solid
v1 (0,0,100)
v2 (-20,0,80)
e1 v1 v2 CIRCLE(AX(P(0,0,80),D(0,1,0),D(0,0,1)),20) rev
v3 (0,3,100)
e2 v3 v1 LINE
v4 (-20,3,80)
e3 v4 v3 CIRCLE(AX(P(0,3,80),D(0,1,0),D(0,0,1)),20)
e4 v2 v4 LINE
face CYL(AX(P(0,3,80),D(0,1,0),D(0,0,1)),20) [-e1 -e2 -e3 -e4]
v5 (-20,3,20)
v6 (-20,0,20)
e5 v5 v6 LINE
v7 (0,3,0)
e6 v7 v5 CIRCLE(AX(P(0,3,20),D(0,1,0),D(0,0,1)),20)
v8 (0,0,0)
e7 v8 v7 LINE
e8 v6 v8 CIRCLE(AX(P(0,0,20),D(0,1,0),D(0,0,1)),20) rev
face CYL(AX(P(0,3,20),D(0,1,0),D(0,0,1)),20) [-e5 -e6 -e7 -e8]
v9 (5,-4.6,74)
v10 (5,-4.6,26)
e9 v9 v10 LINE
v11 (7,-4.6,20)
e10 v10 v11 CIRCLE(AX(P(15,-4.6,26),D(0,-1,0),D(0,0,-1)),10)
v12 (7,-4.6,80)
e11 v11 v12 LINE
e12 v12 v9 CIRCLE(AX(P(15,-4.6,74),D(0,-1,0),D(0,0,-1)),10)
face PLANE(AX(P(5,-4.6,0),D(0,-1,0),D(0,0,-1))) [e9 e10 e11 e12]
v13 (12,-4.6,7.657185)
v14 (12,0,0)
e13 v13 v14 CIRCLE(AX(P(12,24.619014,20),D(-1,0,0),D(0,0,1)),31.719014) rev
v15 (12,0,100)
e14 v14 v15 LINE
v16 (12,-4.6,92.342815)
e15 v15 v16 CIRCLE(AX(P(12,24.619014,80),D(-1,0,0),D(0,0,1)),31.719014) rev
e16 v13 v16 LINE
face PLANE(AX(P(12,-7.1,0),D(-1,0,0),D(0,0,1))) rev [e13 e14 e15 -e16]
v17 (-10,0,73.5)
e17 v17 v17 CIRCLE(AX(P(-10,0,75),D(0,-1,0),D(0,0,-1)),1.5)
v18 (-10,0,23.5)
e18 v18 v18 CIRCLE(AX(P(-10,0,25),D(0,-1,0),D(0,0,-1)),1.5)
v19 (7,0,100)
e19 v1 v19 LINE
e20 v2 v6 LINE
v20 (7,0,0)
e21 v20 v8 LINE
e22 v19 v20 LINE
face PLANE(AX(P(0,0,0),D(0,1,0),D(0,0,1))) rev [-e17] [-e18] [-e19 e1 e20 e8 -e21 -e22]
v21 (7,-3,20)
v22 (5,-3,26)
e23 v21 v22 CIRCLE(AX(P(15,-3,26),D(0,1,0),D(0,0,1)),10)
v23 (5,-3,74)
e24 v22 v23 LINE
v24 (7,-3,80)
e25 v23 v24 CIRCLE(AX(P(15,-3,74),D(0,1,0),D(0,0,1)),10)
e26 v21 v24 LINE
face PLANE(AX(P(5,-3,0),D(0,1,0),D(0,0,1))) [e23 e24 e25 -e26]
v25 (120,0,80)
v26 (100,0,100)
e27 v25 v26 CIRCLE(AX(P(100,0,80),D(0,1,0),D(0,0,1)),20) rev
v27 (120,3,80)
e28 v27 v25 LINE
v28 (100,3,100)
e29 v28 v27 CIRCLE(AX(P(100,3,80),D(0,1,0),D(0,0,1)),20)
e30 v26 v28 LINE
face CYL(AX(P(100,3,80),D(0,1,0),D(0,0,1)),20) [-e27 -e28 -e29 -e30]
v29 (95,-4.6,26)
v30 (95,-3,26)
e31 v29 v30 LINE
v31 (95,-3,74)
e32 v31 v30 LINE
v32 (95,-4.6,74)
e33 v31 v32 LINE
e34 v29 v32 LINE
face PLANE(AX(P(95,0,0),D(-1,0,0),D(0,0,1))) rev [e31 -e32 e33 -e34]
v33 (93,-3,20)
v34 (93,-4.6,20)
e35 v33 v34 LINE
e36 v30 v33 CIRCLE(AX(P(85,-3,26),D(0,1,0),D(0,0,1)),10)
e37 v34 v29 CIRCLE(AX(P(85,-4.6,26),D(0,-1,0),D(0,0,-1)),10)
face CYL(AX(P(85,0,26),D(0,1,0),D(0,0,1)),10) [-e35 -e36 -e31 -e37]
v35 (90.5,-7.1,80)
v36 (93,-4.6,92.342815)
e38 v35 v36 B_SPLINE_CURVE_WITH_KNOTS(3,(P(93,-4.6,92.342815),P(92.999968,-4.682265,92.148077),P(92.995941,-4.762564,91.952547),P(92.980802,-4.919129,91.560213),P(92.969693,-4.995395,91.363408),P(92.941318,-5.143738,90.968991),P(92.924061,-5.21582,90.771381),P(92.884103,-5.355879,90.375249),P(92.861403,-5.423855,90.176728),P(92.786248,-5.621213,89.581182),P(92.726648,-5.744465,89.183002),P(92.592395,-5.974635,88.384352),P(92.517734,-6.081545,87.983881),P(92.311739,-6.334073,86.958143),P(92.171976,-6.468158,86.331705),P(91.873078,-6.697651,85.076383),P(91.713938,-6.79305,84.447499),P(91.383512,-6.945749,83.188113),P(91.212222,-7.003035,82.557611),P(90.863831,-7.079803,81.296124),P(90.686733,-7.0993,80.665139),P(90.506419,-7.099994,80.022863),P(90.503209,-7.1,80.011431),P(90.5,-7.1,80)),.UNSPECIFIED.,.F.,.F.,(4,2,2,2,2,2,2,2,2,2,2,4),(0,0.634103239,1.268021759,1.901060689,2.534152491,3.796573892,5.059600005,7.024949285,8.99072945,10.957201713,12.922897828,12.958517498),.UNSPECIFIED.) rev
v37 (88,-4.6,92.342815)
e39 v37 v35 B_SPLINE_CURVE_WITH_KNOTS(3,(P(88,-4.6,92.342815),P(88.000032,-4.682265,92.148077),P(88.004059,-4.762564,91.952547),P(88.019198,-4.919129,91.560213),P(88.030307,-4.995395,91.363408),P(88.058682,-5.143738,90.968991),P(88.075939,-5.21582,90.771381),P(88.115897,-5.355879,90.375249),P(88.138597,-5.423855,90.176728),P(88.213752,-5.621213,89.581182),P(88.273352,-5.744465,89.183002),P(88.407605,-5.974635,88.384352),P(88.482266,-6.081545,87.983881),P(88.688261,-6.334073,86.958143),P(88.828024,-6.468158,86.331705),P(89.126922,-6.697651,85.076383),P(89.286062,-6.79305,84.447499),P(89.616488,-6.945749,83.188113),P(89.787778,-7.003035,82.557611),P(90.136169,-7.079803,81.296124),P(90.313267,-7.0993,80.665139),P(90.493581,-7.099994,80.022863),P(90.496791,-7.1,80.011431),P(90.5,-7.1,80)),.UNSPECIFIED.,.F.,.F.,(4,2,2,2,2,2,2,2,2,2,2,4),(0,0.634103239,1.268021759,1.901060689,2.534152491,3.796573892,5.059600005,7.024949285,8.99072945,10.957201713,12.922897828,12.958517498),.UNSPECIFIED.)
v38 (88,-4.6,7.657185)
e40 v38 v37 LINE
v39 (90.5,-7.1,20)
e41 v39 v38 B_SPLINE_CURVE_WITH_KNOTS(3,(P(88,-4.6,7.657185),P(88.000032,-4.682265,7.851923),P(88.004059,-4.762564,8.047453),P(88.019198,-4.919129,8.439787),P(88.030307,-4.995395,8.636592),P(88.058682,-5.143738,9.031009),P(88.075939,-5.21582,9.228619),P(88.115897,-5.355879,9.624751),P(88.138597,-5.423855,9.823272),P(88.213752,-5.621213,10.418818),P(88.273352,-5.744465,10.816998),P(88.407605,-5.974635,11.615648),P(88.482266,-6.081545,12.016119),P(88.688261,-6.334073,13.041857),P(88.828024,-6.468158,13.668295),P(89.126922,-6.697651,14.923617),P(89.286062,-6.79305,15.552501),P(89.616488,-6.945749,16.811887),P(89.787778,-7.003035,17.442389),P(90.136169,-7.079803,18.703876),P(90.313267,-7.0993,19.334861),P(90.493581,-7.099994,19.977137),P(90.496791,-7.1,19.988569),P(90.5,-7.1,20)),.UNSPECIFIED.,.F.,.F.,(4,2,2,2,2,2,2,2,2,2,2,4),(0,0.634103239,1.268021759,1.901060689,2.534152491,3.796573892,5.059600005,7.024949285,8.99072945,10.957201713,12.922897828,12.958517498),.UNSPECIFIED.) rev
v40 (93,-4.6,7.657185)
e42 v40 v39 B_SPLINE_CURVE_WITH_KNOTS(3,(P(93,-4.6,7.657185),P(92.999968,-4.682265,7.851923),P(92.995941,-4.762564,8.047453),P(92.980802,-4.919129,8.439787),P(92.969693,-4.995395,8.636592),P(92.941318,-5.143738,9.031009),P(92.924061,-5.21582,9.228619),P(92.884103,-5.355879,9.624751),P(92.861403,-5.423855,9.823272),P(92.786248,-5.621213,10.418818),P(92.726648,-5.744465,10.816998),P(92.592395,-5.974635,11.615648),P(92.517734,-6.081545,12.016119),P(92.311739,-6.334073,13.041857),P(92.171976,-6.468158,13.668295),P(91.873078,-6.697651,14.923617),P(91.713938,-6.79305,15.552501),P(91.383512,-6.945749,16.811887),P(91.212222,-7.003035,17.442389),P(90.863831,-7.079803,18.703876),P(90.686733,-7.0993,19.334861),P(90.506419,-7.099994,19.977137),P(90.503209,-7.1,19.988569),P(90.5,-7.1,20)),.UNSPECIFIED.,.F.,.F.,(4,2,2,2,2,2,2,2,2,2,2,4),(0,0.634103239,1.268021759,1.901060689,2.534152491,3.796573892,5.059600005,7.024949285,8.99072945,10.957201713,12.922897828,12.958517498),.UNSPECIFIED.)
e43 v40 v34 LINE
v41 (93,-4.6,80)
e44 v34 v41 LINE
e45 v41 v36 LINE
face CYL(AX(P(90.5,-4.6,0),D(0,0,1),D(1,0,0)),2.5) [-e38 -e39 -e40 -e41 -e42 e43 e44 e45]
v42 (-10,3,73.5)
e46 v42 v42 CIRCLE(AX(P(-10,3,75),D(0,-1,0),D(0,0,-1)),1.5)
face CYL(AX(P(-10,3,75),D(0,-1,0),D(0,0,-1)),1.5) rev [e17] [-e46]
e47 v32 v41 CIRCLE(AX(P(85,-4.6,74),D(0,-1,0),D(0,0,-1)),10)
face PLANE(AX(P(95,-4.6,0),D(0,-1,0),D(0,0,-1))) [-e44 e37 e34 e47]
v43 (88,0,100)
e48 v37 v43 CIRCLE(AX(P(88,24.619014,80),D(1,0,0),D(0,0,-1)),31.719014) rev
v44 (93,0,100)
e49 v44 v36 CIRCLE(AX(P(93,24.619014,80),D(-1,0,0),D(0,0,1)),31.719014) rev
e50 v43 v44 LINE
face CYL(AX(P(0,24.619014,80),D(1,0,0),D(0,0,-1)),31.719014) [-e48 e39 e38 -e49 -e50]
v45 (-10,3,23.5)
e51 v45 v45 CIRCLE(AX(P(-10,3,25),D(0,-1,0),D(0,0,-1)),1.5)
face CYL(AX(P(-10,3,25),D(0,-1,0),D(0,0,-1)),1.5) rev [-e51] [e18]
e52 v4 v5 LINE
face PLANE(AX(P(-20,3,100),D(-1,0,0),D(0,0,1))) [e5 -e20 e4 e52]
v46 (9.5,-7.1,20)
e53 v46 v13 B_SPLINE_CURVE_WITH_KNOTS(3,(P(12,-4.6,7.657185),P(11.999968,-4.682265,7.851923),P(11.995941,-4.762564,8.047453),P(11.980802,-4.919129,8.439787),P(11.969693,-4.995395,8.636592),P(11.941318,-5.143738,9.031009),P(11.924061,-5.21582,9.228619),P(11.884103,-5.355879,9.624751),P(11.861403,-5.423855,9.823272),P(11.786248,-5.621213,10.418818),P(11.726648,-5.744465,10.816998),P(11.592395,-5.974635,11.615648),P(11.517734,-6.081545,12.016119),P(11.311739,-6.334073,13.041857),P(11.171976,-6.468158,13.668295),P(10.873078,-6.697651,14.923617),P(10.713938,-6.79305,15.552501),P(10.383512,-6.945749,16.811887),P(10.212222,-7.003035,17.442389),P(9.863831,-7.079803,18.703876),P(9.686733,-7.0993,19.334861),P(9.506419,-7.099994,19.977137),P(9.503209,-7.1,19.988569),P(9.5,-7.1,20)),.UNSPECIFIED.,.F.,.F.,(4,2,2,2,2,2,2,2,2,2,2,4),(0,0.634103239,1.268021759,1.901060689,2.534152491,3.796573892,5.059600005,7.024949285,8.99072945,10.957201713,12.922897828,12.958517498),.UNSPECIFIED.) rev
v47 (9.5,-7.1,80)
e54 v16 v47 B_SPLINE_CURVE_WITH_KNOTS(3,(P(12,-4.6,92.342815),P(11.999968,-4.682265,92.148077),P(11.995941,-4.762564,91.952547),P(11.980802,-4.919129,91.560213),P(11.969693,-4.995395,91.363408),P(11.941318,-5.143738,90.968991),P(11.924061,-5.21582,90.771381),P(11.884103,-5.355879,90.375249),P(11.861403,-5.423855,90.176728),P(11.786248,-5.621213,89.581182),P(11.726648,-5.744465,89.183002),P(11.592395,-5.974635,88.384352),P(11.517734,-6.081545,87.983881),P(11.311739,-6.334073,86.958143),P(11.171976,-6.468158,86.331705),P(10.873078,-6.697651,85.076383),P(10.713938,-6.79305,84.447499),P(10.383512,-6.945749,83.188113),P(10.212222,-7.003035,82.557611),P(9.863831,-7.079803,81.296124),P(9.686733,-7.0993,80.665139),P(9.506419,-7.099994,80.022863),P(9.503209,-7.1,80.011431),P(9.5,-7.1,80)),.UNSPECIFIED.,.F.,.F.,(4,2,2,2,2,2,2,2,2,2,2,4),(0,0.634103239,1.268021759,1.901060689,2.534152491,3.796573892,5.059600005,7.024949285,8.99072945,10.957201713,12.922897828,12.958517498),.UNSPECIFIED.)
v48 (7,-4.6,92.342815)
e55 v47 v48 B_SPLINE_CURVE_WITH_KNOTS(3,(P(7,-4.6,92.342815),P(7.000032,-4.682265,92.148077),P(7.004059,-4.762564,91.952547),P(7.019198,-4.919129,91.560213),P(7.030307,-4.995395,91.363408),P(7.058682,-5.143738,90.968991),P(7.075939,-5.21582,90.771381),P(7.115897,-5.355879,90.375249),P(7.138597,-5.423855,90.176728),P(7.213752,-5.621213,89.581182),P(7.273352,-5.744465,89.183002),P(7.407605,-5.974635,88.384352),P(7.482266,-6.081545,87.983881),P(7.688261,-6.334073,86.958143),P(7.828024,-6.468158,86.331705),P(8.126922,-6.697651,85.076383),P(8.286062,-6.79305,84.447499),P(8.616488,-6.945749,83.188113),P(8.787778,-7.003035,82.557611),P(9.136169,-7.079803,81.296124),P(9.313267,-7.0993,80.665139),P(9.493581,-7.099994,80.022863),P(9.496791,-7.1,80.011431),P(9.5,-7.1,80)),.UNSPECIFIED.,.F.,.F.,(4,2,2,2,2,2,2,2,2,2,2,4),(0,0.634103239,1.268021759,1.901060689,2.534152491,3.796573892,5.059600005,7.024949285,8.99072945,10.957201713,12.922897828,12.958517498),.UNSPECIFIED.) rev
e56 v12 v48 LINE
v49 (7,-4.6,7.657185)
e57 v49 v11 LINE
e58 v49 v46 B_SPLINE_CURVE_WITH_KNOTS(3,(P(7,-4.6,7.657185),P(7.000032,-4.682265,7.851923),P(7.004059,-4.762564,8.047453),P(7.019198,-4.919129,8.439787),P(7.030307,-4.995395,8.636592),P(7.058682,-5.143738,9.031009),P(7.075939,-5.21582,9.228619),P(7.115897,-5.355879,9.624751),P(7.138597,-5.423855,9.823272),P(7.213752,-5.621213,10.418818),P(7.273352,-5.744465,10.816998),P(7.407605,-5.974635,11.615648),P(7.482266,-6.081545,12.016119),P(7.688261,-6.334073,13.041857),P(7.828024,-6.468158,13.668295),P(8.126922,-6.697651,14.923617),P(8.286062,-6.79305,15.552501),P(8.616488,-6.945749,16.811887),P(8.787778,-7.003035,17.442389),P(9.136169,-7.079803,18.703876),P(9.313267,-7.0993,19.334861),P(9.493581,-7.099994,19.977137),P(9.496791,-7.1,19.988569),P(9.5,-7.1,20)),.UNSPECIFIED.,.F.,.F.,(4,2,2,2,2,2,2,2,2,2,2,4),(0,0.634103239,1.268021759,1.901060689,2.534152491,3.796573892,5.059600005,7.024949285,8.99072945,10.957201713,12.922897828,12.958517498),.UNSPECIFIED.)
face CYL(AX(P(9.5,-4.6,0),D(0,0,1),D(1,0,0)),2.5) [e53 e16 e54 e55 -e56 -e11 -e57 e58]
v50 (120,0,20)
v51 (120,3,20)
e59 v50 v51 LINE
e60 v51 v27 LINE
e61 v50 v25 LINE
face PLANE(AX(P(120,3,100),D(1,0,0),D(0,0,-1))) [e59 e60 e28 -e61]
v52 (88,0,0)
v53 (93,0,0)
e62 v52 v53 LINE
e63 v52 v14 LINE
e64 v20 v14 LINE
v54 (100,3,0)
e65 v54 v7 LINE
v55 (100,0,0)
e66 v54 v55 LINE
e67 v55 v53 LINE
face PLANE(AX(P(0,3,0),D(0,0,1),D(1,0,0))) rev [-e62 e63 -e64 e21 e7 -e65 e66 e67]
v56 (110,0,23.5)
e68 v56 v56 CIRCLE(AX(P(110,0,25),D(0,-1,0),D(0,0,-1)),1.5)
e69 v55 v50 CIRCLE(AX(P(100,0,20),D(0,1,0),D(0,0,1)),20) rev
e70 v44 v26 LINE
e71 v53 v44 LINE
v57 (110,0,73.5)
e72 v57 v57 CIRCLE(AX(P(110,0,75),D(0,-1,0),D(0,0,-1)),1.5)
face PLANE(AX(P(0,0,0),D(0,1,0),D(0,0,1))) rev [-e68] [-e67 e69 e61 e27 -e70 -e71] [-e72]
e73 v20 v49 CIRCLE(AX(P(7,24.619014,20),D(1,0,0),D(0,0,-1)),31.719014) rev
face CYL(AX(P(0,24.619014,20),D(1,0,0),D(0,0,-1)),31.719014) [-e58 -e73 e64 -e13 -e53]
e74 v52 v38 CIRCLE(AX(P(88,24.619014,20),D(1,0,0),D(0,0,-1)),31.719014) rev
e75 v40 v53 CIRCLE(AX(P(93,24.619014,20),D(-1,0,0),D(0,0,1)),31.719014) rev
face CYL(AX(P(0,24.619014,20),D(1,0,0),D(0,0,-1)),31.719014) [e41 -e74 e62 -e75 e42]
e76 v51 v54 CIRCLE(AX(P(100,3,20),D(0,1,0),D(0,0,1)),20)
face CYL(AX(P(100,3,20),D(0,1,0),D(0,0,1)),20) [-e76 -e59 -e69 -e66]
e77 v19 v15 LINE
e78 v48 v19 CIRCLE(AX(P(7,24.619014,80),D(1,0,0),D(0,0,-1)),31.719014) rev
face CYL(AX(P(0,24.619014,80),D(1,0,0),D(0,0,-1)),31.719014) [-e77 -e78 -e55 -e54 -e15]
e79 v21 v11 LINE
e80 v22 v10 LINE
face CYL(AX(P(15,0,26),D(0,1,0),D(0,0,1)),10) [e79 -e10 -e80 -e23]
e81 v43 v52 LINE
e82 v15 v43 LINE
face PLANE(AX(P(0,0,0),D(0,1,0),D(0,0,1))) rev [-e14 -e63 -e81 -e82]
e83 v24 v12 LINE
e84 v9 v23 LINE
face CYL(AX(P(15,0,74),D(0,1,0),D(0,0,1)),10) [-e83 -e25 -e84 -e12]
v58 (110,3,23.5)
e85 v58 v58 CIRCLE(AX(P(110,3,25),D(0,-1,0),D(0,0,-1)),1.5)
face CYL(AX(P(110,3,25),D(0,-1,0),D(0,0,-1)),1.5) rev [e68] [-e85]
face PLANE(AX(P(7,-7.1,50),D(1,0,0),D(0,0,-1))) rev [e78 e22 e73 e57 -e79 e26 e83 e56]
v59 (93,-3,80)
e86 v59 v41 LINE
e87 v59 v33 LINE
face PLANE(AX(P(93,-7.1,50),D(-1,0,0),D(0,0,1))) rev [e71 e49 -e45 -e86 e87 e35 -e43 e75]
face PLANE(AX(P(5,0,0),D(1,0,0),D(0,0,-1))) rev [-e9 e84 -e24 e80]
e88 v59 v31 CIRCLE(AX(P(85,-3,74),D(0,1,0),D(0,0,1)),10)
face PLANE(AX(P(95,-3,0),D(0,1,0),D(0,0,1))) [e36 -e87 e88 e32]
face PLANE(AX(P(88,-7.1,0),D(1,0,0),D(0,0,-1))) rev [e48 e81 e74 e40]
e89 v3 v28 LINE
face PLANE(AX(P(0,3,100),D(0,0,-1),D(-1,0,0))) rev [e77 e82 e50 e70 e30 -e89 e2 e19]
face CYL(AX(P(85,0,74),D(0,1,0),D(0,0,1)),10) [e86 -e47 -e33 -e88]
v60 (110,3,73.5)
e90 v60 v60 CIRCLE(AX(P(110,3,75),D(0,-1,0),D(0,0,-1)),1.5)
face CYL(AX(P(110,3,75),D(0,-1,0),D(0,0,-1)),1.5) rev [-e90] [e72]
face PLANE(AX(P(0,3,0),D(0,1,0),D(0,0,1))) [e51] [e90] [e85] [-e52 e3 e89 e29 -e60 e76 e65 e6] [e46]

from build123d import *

# Parameters (mm, degrees)
SKETCH_1_W          = 100
SKETCH_1_H          = 100
EXTRUDE_1_DEPTH     = 3
SKETCH_9_W          = 20
SKETCH_9_H          = 100
SKETCH_9_R          = 1.5
EXTRUDE_5_DEPTH     = 3
FILLET_1_R          = 20
EXTRUDE_6_DEPTH     = 7.1
CUT_EXTRUDE_5_DEPTH = 100
SKETCH_12_W         = 3.129471857
SKETCH_12_H         = 20
EXTRUDE_7_DEPTH     = 7.1
CUT_EXTRUDE_6_DEPTH = 100
SKETCH_14_W         = 103.339960755
SKETCH_14_H         = 14.24407727
CUT_EXTRUDE_7_DEPTH = 4
SKETCH_25_W         = 30
SKETCH_25_H         = 1.6
EXTRUDE_13_DEPTH    = 7
SKETCH_26_W         = 30
SKETCH_26_H         = 1.6
EXTRUDE_14_DEPTH    = 7
FILLET_7_R          = 10


with BuildPart() as part:
    # 草图1 → 凸台-拉伸1 (new body)
    with BuildSketch(Plane(origin=(0, 0, 0), x_dir=(1, 0, 0), z_dir=(0, 1, 0))):
        with Locations((50, -50)):
            Rectangle(SKETCH_1_W, SKETCH_1_H)
    extrude(amount=EXTRUDE_1_DEPTH)

    # 草图9 → 凸台-拉伸5 (add)
    # profile 1 of 2: a face of its own
    with BuildSketch(Plane.XZ):
        with Locations((110, 50)):
            Rectangle(SKETCH_9_W, SKETCH_9_H)
        with Locations(Location((110, 75, 0), (0, 0, 270))):
            Circle(SKETCH_9_R, mode=Mode.SUBTRACT)
        with Locations(Location((110, 25, 0), (0, 0, 270))):
            Circle(SKETCH_9_R, mode=Mode.SUBTRACT)
    # profile 2 of 2: a face of its own
    with BuildSketch(Plane.XZ):
        with Locations((-10, 50)):
            Rectangle(SKETCH_9_W, SKETCH_9_H)
        with Locations(Location((-10, 75, 0), (0, 0, 270))):
            Circle(SKETCH_9_R, mode=Mode.SUBTRACT)
        with Locations(Location((-10, 25, 0), (0, 0, 270))):
            Circle(SKETCH_9_R, mode=Mode.SUBTRACT)
    extrude(amount=-EXTRUDE_5_DEPTH)

    # 圆角1
    fillet_1_edges = [part.edges().sort_by_distance(p)[0] for p in [
        (120, 1.5, 100),
        (120, 1.5, 0),
        (-20, 1.5, 0),
        (-20, 1.5, 100),
    ]]
    fillet(fillet_1_edges, radius=FILLET_1_R)

    # 草图10 → 凸台-拉伸6 (add)
    with BuildSketch(Plane.XZ):
        Polygon((7, 50), (7, 0), (12, 0), (12, 100), (7, 100), align=None)
        Polygon((93, 50), (93, 0), (88, 0), (88, 100), (93, 100), align=None)
    extrude(amount=EXTRUDE_6_DEPTH)

    # 草图11 → 切除-拉伸5 (cut)
    with BuildSketch(Plane.XY.offset(100)):
        with BuildLine():
            Line((88, -4.6), (88, -7.1))
            Line((88, -7.1), (90.5, -7.1))
            ThreePointArc((90.5, -7.1), (88.732233047, -6.367766953), (88, -4.6))
        make_face()
        with BuildLine():
            ThreePointArc((93, -4.6), (92.267766953, -6.367766953), (90.5, -7.1))
            Line((90.5, -7.1), (93, -7.1))
            Line((93, -7.1), (93, -4.6))
        make_face()
        with BuildLine():
            ThreePointArc((12, -4.6), (11.267766953, -6.367766953), (9.5, -7.1))
            Line((9.5, -7.1), (12, -7.1))
            Line((12, -7.1), (12, -4.6))
        make_face()
        with BuildLine():
            ThreePointArc((9.5, -7.1), (7.732233047, -6.367766953), (7, -4.6))
            Line((7, -4.6), (7, -7.1))
            Line((7, -7.1), (9.5, -7.1))
        make_face()
    extrude(amount=-CUT_EXTRUDE_5_DEPTH, mode=Mode.SUBTRACT)

    # 草图12 → 凸台-拉伸7 (add)
    with BuildSketch(Plane.XZ):
        with Locations((98.435264072, 90)):
            Rectangle(SKETCH_12_W, SKETCH_12_H)
        with Locations((98.435264072, 10)):
            Rectangle(SKETCH_12_W, SKETCH_12_H)
    extrude(amount=EXTRUDE_7_DEPTH)

    # 草图13 → 切除-拉伸6 (cut)
    with BuildSketch(Plane(origin=(100, 0, 0), x_dir=(0, 0, -1), z_dir=(1, 0, 0))):
        with BuildLine():
            Line((-100, -7.1), (-100, 0))
            ThreePointArc((-100, 0), (-90.611432514, -5.27234511), (-80, -7.1))
            Line((-80, -7.1), (-100, -7.1))
        make_face()
        with BuildLine():
            Line((-20, -7.1), (0, -7.1))
            Line((0, -7.1), (0, 0))
            ThreePointArc((0, 0), (-9.388567486, -5.27234511), (-20, -7.1))
        make_face()
    extrude(amount=-CUT_EXTRUDE_6_DEPTH, mode=Mode.SUBTRACT)

    # 草图14 → 切除-拉伸7 (cut)
    with BuildSketch(Plane(origin=(100, 0, 0), x_dir=(0, 0, -1), z_dir=(1, 0, 0))):
        with Locations((-48.330019622, -7.122038635)):
            Rectangle(SKETCH_14_W, SKETCH_14_H)
    extrude(amount=-CUT_EXTRUDE_7_DEPTH, mode=Mode.SUBTRACT)

    # 草图25 → 凸台-拉伸13 (add)
    with BuildSketch(Plane.ZY.offset(-88)):
        with Locations((65, -3.8)):
            Rectangle(SKETCH_25_W, SKETCH_25_H)
        with Locations((35, -3.8)):
            Rectangle(SKETCH_25_W, SKETCH_25_H)
    extrude(amount=-EXTRUDE_13_DEPTH)

    # 草图26 → 凸台-拉伸14 (add)
    with BuildSketch(Plane(origin=(12, 0, 0), x_dir=(0, 0, -1), z_dir=(1, 0, 0))):
        with Locations((-65, -3.8)):
            Rectangle(SKETCH_26_W, SKETCH_26_H)
        with Locations((-35, -3.8)):
            Rectangle(SKETCH_26_W, SKETCH_26_H)
    extrude(amount=-EXTRUDE_14_DEPTH)

    # 圆角7
    # the kernel refuses this fillet: 10 mm, written as the material it takes off along each edge
    with BuildSketch(Plane(origin=(95, 12, 20), x_dir=(-1, 0, 0), z_dir=(0, -1, 0))) as fillet_7_piece_1_section:
        with BuildLine():
            CenterArc((10, -6), FILLET_7_R, 143.130102354, 36.869897646)
            Line((0, -6), (0, 0))
            Line((0, 0), (2, 0))
        make_face()
    fillet_7_piece_1 = extrude(amount=31.6, mode=Mode.PRIVATE)
    fillet_7_piece_1 = split(fillet_7_piece_1, bisect_by=Plane(origin=(94.505806646, 0, 22.831397785), z_dir=(0, -1, 0)), keep=Keep.TOP, mode=Mode.PRIVATE)
    add(fillet_7_piece_1, mode=Mode.SUBTRACT)
    with BuildSketch(Plane(origin=(95, -19.6, 80), x_dir=(0, 0, -1), z_dir=(0, 1, 0))) as fillet_7_piece_2_section:
        with BuildLine():
            CenterArc((6, 10), FILLET_7_R, 233.130102354, 36.869897646)
            Line((0, 2), (0, 0))
            Line((0, 0), (6, 0))
        make_face()
    fillet_7_piece_2 = extrude(amount=31.6, mode=Mode.PRIVATE)
    fillet_7_piece_2 = split(fillet_7_piece_2, bisect_by=Plane(origin=(94.505806646, 0, 77.168602215), z_dir=(0, -1, 0)), keep=Keep.TOP, mode=Mode.PRIVATE)
    add(fillet_7_piece_2, mode=Mode.SUBTRACT)
    with BuildSketch(Plane(origin=(5, -19.6, 20), x_dir=(0, 0, 1), z_dir=(0, 1, 0))) as fillet_7_piece_3_section:
        with BuildLine():
            CenterArc((6, 10), FILLET_7_R, 233.130102354, 36.869897646)
            Line((0, 2), (0, 0))
            Line((0, 0), (6, 0))
        make_face()
    fillet_7_piece_3 = extrude(amount=31.6, mode=Mode.PRIVATE)
    fillet_7_piece_3 = split(fillet_7_piece_3, bisect_by=Plane(origin=(5.494193354, 0, 22.831397785), z_dir=(0, -1, 0)), keep=Keep.TOP, mode=Mode.PRIVATE)
    add(fillet_7_piece_3, mode=Mode.SUBTRACT)
    with BuildSketch(Plane(origin=(5, 12, 80), x_dir=(1, 0, 0), z_dir=(0, -1, 0))) as fillet_7_piece_4_section:
        with BuildLine():
            CenterArc((10, -6), FILLET_7_R, 143.130102354, 36.869897646)
            Line((0, -6), (0, 0))
            Line((0, 0), (2, 0))
        make_face()
    fillet_7_piece_4 = extrude(amount=31.6, mode=Mode.PRIVATE)
    fillet_7_piece_4 = split(fillet_7_piece_4, bisect_by=Plane(origin=(5.494193354, 0, 77.168602215), z_dir=(0, -1, 0)), keep=Keep.TOP, mode=Mode.PRIVATE)
    add(fillet_7_piece_4, mode=Mode.SUBTRACT)


solid = part.part
